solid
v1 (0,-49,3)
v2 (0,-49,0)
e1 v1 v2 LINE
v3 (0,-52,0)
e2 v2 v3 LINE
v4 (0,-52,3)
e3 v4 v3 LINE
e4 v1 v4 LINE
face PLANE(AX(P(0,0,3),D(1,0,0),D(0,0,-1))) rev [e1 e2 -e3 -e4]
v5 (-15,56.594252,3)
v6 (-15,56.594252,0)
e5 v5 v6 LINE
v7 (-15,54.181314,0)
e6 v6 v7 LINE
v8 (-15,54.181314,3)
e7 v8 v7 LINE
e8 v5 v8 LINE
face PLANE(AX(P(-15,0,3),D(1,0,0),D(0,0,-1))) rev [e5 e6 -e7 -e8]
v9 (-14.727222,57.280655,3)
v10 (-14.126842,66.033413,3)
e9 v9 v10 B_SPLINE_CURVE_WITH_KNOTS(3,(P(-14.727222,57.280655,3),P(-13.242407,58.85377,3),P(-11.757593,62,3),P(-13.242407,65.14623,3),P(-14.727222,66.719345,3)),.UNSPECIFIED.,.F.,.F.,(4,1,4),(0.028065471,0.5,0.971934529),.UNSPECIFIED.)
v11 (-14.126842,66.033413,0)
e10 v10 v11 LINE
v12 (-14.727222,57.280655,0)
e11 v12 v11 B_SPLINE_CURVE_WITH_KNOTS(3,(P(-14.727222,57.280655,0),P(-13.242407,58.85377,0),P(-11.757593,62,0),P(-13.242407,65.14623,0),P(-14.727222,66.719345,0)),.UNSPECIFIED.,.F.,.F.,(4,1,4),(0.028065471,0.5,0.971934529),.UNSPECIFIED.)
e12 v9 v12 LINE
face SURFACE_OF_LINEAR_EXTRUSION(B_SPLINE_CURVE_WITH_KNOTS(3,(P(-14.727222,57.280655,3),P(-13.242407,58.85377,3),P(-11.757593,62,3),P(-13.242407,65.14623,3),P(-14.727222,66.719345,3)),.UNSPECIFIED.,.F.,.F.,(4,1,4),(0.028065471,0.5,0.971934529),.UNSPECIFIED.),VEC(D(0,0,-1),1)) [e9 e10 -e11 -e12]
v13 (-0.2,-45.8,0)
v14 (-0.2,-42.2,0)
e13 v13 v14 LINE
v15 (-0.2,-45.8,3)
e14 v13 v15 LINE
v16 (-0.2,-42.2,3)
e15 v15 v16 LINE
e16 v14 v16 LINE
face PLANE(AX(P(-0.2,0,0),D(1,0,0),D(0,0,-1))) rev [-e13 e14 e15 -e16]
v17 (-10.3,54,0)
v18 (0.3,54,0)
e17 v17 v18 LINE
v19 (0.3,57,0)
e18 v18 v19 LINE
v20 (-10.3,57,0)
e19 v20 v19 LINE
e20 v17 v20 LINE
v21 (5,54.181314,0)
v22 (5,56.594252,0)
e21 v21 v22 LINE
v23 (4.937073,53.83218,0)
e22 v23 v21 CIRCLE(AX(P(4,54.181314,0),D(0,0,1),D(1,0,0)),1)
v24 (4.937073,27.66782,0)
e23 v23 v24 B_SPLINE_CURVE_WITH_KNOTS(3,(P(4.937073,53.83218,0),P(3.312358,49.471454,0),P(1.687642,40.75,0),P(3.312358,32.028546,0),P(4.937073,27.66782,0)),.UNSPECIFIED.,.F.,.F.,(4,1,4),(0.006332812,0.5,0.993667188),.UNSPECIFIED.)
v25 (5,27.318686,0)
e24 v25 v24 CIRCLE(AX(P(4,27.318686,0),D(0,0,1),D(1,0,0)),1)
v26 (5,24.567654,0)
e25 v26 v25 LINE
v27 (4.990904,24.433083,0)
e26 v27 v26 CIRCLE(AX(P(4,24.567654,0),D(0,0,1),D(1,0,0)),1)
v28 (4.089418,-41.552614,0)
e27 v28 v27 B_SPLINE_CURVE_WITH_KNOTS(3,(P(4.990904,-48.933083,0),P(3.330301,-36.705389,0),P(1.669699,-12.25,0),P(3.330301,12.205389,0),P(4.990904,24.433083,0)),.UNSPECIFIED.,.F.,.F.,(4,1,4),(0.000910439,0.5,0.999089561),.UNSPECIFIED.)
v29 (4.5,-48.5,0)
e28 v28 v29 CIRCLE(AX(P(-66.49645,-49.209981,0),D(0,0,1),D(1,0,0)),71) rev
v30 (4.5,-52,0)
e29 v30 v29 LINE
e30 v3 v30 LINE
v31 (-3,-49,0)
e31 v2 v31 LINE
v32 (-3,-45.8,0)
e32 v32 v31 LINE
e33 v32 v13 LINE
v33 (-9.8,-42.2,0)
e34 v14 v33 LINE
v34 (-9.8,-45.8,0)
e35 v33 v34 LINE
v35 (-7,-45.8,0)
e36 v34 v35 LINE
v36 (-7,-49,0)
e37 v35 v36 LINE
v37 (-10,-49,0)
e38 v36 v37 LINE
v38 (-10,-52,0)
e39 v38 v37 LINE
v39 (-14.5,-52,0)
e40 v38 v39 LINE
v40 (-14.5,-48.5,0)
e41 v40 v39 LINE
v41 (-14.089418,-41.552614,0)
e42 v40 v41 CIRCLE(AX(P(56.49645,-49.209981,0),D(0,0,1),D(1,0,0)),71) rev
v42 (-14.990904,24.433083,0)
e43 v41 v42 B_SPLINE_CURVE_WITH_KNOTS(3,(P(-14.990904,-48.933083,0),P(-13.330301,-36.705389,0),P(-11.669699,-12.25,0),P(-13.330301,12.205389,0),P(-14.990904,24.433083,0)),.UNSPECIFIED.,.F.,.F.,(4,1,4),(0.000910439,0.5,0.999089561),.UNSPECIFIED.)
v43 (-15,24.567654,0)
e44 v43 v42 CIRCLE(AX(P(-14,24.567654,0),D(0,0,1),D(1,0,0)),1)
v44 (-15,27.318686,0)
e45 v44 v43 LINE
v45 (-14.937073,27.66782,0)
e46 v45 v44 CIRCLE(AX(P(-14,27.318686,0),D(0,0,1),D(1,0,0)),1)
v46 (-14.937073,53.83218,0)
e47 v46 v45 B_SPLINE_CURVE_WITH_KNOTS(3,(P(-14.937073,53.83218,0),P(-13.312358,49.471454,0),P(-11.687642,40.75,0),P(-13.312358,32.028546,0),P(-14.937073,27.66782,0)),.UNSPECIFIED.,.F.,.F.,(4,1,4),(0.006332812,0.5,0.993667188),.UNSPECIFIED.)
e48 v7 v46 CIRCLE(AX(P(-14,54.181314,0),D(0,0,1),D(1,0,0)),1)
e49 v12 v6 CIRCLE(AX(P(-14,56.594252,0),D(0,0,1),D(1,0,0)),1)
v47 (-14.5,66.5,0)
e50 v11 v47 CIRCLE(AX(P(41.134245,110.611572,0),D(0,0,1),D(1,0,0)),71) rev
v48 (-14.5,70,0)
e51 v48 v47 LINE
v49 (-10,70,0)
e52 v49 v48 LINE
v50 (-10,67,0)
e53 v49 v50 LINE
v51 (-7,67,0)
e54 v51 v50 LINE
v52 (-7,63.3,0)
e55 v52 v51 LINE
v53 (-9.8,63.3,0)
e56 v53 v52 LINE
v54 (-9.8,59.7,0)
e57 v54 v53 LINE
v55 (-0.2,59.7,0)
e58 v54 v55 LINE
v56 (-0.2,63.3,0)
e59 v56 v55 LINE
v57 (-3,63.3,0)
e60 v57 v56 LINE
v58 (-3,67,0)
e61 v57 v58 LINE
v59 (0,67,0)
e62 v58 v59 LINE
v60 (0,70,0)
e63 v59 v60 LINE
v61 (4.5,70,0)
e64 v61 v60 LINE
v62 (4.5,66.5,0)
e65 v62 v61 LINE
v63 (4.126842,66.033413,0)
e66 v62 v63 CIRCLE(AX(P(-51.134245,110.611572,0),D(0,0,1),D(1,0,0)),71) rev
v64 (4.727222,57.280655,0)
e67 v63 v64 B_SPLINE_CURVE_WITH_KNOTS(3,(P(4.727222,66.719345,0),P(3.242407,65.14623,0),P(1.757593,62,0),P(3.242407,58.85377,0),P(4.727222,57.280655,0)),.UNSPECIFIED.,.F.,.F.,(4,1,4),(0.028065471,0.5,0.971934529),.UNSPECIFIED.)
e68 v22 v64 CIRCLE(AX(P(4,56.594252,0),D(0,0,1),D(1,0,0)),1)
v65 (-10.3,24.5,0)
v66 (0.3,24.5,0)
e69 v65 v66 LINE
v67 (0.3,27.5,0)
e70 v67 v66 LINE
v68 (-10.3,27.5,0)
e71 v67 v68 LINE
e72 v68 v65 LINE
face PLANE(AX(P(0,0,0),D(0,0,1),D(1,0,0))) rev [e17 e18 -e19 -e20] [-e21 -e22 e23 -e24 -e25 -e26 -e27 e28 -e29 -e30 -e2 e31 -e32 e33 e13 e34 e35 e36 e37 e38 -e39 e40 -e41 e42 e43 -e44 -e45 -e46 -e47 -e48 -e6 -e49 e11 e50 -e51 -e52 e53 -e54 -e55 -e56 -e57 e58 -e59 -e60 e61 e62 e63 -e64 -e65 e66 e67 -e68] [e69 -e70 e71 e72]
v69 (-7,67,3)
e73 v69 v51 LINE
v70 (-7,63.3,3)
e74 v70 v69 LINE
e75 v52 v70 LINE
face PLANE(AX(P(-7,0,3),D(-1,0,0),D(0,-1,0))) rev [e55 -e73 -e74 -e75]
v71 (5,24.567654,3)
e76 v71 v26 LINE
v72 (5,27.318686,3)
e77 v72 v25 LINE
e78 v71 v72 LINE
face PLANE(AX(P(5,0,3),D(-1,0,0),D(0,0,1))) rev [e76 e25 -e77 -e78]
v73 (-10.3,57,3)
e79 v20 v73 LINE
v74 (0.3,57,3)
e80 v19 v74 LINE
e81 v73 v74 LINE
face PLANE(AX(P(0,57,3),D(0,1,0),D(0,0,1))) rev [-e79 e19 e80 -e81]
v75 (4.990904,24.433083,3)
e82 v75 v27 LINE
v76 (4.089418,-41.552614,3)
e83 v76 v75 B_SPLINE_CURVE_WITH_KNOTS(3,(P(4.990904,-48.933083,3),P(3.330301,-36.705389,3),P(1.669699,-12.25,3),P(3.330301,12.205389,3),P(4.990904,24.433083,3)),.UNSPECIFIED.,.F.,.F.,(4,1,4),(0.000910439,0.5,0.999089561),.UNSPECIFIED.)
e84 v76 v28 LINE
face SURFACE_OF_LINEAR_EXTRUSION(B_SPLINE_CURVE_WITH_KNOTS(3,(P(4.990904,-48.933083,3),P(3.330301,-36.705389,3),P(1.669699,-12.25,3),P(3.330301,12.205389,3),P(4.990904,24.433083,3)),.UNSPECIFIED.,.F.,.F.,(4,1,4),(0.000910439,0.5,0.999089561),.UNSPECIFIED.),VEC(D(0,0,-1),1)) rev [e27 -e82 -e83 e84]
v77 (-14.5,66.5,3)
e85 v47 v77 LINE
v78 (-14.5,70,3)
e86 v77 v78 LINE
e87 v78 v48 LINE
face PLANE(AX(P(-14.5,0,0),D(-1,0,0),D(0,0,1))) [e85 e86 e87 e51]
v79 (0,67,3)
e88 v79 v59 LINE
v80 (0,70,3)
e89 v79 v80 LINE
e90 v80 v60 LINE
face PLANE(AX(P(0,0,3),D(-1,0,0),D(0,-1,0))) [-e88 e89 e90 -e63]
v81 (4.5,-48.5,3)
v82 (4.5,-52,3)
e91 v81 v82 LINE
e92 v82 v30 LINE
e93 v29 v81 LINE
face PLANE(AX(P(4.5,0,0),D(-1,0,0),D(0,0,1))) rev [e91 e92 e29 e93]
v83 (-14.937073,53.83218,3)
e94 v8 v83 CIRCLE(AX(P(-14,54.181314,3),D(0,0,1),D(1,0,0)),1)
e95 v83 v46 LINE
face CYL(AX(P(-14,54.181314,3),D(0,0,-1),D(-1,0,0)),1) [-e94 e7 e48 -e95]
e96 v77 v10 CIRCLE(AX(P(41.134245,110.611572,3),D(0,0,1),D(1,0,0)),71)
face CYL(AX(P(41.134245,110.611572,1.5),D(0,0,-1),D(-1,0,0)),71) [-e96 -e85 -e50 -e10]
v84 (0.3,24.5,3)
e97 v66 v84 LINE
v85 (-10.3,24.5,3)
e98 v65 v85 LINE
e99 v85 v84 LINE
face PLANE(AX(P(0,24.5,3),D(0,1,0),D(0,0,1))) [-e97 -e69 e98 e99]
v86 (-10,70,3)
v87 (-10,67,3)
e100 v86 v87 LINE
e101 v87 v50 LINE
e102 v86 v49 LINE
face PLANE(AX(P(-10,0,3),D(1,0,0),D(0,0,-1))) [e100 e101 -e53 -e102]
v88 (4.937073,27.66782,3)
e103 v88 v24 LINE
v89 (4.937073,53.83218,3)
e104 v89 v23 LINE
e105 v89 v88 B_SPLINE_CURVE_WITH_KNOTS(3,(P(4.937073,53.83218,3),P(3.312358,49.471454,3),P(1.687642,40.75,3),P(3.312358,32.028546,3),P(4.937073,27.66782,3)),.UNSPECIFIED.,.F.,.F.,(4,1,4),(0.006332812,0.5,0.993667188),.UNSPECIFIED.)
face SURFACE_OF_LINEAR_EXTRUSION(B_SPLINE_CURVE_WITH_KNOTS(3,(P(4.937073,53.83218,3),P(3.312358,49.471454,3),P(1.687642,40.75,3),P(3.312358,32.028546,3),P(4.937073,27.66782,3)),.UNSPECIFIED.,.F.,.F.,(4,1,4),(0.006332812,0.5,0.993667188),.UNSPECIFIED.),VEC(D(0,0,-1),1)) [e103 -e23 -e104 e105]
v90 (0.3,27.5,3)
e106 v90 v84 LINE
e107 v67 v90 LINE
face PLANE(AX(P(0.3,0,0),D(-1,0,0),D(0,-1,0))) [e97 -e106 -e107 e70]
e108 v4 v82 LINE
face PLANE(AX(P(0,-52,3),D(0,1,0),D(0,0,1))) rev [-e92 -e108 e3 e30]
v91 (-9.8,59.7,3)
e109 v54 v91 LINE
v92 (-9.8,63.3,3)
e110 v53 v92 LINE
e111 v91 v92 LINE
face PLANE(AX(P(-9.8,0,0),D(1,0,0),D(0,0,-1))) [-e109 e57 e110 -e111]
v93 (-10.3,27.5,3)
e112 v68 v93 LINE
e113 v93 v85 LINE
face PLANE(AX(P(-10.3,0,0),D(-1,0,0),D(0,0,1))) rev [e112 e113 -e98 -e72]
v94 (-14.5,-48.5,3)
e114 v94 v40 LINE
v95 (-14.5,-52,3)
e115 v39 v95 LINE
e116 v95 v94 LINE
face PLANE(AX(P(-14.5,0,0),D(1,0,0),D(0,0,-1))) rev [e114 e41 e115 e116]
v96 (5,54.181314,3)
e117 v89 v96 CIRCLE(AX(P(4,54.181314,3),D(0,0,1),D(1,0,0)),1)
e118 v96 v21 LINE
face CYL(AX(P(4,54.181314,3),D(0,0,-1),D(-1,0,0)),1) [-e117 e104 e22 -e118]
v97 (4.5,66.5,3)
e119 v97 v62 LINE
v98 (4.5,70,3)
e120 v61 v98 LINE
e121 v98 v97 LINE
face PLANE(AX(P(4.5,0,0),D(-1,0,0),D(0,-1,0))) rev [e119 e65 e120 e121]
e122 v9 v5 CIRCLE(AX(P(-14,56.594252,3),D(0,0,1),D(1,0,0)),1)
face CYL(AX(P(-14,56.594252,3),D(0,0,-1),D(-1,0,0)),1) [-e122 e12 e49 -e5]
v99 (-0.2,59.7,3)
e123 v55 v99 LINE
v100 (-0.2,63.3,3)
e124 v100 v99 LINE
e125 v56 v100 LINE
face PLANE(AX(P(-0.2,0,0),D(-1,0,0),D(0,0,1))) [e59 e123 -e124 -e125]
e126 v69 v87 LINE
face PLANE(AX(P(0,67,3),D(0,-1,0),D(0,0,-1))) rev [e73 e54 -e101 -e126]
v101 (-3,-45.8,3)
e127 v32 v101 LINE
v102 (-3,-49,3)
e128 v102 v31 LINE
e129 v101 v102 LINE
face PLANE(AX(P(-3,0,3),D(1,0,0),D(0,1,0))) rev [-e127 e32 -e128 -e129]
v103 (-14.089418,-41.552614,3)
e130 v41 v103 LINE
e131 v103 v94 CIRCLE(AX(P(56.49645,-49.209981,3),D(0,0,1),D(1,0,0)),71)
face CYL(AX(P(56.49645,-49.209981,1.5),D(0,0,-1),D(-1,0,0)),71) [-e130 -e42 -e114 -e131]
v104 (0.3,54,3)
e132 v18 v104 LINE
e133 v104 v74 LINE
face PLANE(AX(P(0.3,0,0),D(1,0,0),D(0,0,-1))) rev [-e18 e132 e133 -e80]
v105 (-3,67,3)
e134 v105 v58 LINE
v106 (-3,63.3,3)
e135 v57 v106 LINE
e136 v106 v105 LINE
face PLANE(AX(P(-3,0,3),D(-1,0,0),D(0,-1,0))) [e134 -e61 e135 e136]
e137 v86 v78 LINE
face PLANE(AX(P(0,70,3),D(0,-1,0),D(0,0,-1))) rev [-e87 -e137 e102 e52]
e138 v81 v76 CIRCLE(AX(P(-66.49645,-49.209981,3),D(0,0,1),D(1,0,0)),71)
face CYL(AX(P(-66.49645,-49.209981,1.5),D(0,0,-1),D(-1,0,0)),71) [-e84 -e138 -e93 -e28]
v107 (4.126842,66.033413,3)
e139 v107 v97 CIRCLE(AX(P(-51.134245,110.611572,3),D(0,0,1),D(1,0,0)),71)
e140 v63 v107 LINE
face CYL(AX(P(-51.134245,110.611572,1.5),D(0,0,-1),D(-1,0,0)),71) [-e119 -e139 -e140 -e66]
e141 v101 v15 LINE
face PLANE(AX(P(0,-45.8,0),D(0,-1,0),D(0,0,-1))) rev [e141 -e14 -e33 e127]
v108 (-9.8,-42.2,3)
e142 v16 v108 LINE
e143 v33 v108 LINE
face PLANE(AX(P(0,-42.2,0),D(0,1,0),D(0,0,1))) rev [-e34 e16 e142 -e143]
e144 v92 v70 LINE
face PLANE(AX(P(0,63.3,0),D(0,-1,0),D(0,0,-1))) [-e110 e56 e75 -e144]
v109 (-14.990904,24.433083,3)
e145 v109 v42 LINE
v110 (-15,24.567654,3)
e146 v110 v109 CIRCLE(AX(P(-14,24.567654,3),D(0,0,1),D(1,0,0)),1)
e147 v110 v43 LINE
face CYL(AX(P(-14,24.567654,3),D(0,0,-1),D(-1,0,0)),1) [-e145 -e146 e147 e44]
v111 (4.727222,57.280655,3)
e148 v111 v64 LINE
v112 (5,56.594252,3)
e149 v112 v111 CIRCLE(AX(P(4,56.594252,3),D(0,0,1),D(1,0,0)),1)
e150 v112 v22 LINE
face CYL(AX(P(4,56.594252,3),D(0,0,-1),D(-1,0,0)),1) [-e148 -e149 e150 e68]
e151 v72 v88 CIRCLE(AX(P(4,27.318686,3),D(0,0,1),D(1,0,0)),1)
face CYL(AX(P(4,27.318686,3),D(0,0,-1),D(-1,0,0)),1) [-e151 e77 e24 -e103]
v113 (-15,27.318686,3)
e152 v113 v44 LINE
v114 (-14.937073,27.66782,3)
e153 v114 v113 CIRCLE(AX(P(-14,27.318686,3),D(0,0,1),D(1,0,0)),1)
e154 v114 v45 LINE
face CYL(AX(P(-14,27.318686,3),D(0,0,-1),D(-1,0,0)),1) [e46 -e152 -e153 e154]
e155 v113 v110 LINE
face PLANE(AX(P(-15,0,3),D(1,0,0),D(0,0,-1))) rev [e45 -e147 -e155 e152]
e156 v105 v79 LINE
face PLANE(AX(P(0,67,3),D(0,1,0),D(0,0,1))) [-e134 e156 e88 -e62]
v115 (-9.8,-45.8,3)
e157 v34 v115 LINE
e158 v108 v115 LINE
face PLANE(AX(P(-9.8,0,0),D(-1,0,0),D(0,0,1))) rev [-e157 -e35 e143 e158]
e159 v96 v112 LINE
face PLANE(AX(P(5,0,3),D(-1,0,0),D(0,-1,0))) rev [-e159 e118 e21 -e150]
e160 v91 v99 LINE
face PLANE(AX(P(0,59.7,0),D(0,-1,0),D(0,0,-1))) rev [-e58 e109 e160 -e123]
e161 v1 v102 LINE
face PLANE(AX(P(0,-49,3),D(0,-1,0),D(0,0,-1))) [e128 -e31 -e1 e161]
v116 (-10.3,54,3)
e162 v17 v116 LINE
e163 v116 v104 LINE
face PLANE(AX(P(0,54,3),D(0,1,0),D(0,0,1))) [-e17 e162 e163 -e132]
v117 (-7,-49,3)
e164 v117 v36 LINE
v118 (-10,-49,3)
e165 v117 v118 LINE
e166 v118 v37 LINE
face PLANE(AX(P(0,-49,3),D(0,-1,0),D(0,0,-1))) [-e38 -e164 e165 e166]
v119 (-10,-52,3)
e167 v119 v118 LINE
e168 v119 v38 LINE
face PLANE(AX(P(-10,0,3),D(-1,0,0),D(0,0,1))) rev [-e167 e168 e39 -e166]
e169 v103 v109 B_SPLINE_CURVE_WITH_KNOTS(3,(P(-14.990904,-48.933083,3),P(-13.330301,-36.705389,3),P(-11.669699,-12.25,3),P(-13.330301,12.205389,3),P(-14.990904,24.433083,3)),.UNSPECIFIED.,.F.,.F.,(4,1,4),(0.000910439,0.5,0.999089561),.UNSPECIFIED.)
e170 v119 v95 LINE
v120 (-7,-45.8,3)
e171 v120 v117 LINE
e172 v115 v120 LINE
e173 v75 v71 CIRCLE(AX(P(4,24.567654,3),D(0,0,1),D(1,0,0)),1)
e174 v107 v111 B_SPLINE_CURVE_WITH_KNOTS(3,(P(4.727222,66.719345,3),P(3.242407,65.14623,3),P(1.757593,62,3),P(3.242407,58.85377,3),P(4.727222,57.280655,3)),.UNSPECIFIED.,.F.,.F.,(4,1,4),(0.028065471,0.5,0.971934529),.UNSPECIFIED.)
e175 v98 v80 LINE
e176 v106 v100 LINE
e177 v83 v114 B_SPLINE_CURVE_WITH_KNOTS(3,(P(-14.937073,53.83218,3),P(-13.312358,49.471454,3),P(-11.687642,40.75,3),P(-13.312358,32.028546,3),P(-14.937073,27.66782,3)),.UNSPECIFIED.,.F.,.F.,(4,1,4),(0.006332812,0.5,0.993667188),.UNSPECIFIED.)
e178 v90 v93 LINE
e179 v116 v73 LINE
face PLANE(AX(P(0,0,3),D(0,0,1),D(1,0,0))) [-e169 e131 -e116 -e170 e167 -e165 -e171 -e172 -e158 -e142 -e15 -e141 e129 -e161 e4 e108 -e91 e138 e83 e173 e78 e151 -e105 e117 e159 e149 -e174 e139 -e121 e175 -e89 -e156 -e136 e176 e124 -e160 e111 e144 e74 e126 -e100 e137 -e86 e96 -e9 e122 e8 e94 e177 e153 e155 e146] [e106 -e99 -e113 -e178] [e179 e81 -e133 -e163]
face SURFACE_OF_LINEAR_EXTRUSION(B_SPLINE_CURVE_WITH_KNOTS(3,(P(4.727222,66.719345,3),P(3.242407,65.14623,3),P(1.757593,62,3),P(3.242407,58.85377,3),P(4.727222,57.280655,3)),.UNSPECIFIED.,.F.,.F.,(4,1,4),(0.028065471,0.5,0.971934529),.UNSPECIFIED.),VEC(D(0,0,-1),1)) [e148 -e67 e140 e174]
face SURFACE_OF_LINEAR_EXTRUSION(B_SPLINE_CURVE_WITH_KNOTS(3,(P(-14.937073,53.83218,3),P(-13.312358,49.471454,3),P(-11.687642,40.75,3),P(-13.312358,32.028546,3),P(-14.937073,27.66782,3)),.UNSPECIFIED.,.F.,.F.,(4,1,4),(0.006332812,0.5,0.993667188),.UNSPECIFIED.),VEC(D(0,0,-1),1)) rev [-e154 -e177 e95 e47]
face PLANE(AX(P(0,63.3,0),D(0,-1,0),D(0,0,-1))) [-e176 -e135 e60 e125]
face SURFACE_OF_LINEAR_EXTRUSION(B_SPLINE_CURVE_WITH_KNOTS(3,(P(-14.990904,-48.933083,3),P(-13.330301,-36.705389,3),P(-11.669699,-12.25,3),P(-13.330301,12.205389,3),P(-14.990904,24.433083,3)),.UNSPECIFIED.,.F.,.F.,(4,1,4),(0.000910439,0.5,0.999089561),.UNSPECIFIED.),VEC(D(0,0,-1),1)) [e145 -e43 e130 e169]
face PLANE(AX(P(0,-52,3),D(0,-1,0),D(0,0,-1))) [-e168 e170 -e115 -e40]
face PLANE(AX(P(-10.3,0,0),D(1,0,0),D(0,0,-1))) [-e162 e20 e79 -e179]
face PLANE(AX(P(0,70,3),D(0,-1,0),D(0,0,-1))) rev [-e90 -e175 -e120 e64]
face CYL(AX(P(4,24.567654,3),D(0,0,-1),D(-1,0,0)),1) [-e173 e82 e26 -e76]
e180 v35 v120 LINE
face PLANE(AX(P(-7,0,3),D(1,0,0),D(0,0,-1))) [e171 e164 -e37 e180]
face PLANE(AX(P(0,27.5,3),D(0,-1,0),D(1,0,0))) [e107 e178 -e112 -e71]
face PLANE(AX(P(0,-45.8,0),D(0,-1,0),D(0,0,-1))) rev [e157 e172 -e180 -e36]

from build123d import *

# Parameters (mm, degrees)
CROQUIS1_W              = 10
CROQUIS1_H              = 3
SALIENTE_EXTRUIR1_DEPTH = 3
CROQUIS2_W              = 0.3
CROQUIS2_H              = 0.3
CROQUIS2_H_2            = 3
CORTAR_EXTRUIR2_DEPTH   = 3
CROQUIS3_W              = 3
CROQUIS3_H              = 3.5
CORTAR_EXTRUIR3_DEPTH   = 0.5
CROQUIS4_W              = 3
CROQUIS4_H              = 3.5
CORTAR_EXTRUIR4_DEPTH   = 0.5
CROQUIS5_W              = 3
CROQUIS5_H              = 3.5
CORTAR_EXTRUIR5_DEPTH   = 0.5
CROQUIS6_W              = 3
CROQUIS6_H              = 3.5
CORTAR_EXTRUIR6_DEPTH   = 0.5
REDONDEO1_START         = -1
REDONDEO1_DEPTH         = 5


with BuildPart() as part:
    # Croquis1 → Saliente-Extruir1 (new body)
    with BuildSketch(Plane.XY):
        with BuildLine():
            Line((-10, 70), (-10, 67))
            Line((-10, 67), (-7, 67))
            Line((-7, 67), (-7, 63))
            Line((-7, 63), (-9.5, 63))
            Line((-9.5, 63), (-9.5, 60))
            Line((-9.5, 60), (-0.5, 60))
            Line((-0.5, 60), (-0.5, 63))
            Line((-0.5, 63), (-3, 63))
            Line((-3, 63), (-3, 67))
            Line((-3, 67), (0, 67))
            Line((0, 67), (0, 70))
            Line((0, 70), (5, 70))
            Line((5, 70), (5, 67.405747627))
            ThreePointArc((5, 67.405747627), (4.929306729, 67.036438809), (4.727221995, 66.719345288))
            add(Edge.make_bspline(
                [(4.727221995, 66.719345288), (3.242407332, 65.146230192), (1.757592668, 62), (3.242407332, 58.853769808), (4.727221995, 57.280654712)],
                knots=[0.028065471, 0.028065471, 0.028065471, 0.028065471, 0.5, 0.971934529, 0.971934529, 0.971934529, 0.971934529], degree=3))
            ThreePointArc((4.727221995, 57.280654712), (4.929306729, 56.963561191), (5, 56.594252373))
            Line((5, 56.594252373), (5, 54.181314171))
            ThreePointArc((5, 54.181314171), (4.9841425, 54.003934523), (4.937072921, 53.832180471))
            add(Edge.make_bspline(
                [(4.937072921, 53.832180471), (3.31235764, 49.471453647), (1.68764236, 40.75), (3.31235764, 32.028546353), (4.937072921, 27.667819529)],
                knots=[0.006332812, 0.006332812, 0.006332812, 0.006332812, 0.5, 0.993667188, 0.993667188, 0.993667188, 0.993667188], degree=3))
            ThreePointArc((4.937072921, 27.667819529), (4.9841425, 27.496065477), (5, 27.318685829))
            Line((5, 27.318685829), (5, 24.567654138))
            ThreePointArc((5, 24.567654138), (4.997723384, 24.500214919), (4.990903903, 24.433082766))
            add(Edge.make_bspline(
                [(4.990903903, -48.933082766), (3.330301301, -36.70538851), (1.669698699, -12.25), (3.330301301, 12.20538851), (4.990903903, 24.433082766)],
                knots=[0.000910439, 0.000910439, 0.000910439, 0.000910439, 0.5, 0.999089561, 0.999089561, 0.999089561, 0.999089561], degree=3))
            ThreePointArc((4.990903903, -48.933082766), (4.997723384, -49.000214919), (5, -49.067654138))
            Line((5, -49.067654138), (5, -51.701381229))
            Line((5, -51.701381229), (5, -52))
            Line((5, -52), (0, -52))
            Line((0, -52), (0, -49))
            Line((0, -49), (-3, -49))
            Line((-3, -49), (-3, -45.5))
            Line((-3, -45.5), (-0.5, -45.5))
            Line((-0.5, -45.5), (-0.5, -42.5))
            Line((-0.5, -42.5), (-9.5, -42.5))
            Line((-9.5, -42.5), (-9.5, -45.5))
            Line((-9.5, -45.5), (-7, -45.5))
            Line((-7, -45.5), (-7, -49))
            Line((-7, -49), (-10, -49))
            Line((-10, -49), (-10, -52))
            Line((-10, -52), (-15, -52))
            Line((-15, -52), (-15, -51.701381229))
            Line((-15, -51.701381229), (-15, -49.067654138))
            ThreePointArc((-15, -49.067654138), (-14.997723384, -49.000214919), (-14.990903903, -48.933082766))
            add(Edge.make_bspline(
                [(-14.990903903, -48.933082766), (-13.330301301, -36.70538851), (-11.669698699, -12.25), (-13.330301301, 12.20538851), (-14.990903903, 24.433082766)],
                knots=[0.000910439, 0.000910439, 0.000910439, 0.000910439, 0.5, 0.999089561, 0.999089561, 0.999089561, 0.999089561], degree=3))
            ThreePointArc((-14.990903903, 24.433082766), (-14.997723384, 24.500214919), (-15, 24.567654138))
            Line((-15, 24.567654138), (-15, 27.318685829))
            ThreePointArc((-15, 27.318685829), (-14.9841425, 27.496065477), (-14.937072921, 27.667819529))
            add(Edge.make_bspline(
                [(-14.937072921, 53.832180471), (-13.31235764, 49.471453647), (-11.68764236, 40.75), (-13.31235764, 32.028546353), (-14.937072921, 27.667819529)],
                knots=[0.006332812, 0.006332812, 0.006332812, 0.006332812, 0.5, 0.993667188, 0.993667188, 0.993667188, 0.993667188], degree=3))
            ThreePointArc((-14.937072921, 53.832180471), (-14.9841425, 54.003934523), (-15, 54.181314171))
            Line((-15, 54.181314171), (-15, 56.594252373))
            ThreePointArc((-15, 56.594252373), (-14.929306729, 56.963561191), (-14.727221995, 57.280654712))
            add(Edge.make_bspline(
                [(-14.727221995, 57.280654712), (-13.242407332, 58.853769808), (-11.757592668, 62), (-13.242407332, 65.146230192), (-14.727221995, 66.719345288)],
                knots=[0.028065471, 0.028065471, 0.028065471, 0.028065471, 0.5, 0.971934529, 0.971934529, 0.971934529, 0.971934529], degree=3))
            ThreePointArc((-14.727221995, 66.719345288), (-14.929306729, 67.036438809), (-15, 67.405747627))
            Line((-15, 67.405747627), (-15, 70))
            Line((-15, 70), (-10, 70))
        make_face()
        with Locations((-5, 26)):
            Rectangle(CROQUIS1_W, CROQUIS1_H, mode=Mode.SUBTRACT)
        with Locations((-5, 55.5)):
            Rectangle(CROQUIS1_W, CROQUIS1_H, mode=Mode.SUBTRACT)
    extrude(amount=SALIENTE_EXTRUIR1_DEPTH)

    # Croquis2 → Cortar-Extruir2 (cut)
    with BuildSketch(Plane.XY.offset(3)):
        Polygon((-9.8, -45.5), (-9.8, -45.8), (-9.5, -45.8), (-7, -45.8), (-7, -45.5), (-9.5, -45.5), (-9.5, -42.5), (-0.5, -42.5), (-0.5, -42.2), (-9.5, -42.2), (-9.8, -42.2), (-9.8, -42.5), align=None)
        Polygon((-0.5, -45.8), (-0.2, -45.8), (-0.2, -45.5), (-0.2, -42.5), (-0.5, -42.5), (-0.5, -45.5), (-3, -45.5), (-3, -45.8), align=None)
        with Locations((-0.35, -42.35)):
            Rectangle(CROQUIS2_W, CROQUIS2_H)
        with Locations((-10.15, 26)):
            Rectangle(CROQUIS2_W, CROQUIS2_H_2)
        with Locations((0.15, 26)):
            Rectangle(CROQUIS2_W, CROQUIS2_H_2)
        with Locations((0.15, 55.5)):
            Rectangle(CROQUIS2_W, CROQUIS2_H_2)
        with Locations((-10.15, 55.5)):
            Rectangle(CROQUIS2_W, CROQUIS2_H_2)
        Polygon((-9.8, 63.3), (-9.5, 63.3), (-7, 63.3), (-7, 63), (-9.5, 63), (-9.5, 60), (-0.5, 60), (-0.5, 63), (-3, 63), (-3, 63.3), (-0.5, 63.3), (-0.2, 63.3), (-0.2, 63), (-0.2, 60), (-0.2, 59.7), (-0.5, 59.7), (-9.5, 59.7), (-9.8, 59.7), (-9.8, 60), (-9.8, 63), align=None)
    extrude(amount=-CORTAR_EXTRUIR2_DEPTH, mode=Mode.SUBTRACT)

    # Croquis3 → Cortar-Extruir3 (cut)
    with BuildSketch(Plane.ZY.offset(15)):
        with Locations((1.5, -50.25)):
            Rectangle(CROQUIS3_W, CROQUIS3_H)
    extrude(amount=-CORTAR_EXTRUIR3_DEPTH, mode=Mode.SUBTRACT)

    # Croquis4 → Cortar-Extruir4 (cut)
    with BuildSketch(Plane(origin=(5, 0, 0), x_dir=(0, 0, -1), z_dir=(1, 0, 0))):
        with Locations((-1.5, -50.25)):
            Rectangle(CROQUIS4_W, CROQUIS4_H)
    extrude(amount=-CORTAR_EXTRUIR4_DEPTH, mode=Mode.SUBTRACT)

    # Croquis5 → Cortar-Extruir5 (cut)
    with BuildSketch(Plane.ZY.offset(15)):
        with Locations((1.5, 68.25)):
            Rectangle(CROQUIS5_W, CROQUIS5_H)
    extrude(amount=-CORTAR_EXTRUIR5_DEPTH, mode=Mode.SUBTRACT)

    # Croquis6 → Cortar-Extruir6 (cut)
    with BuildSketch(Plane(origin=(5, 0, 0), x_dir=(0, 0, -1), z_dir=(1, 0, 0))):
        with Locations((-1.5, 68.25)):
            Rectangle(CROQUIS6_W, CROQUIS6_H)
    extrude(amount=-CORTAR_EXTRUIR6_DEPTH, mode=Mode.SUBTRACT)

    # Redondeo1: read off the stored shape, not the designer's step
    # Redondeo1 outline → Redondeo1 (cut)
    with BuildSketch(Plane.XY.offset(REDONDEO1_START)):
        with BuildLine():
            Line((-14.932435559, -48.5), (-14.5, -48.5))
            ThreePointArc((-14.5, -48.5), (-14.379883961, -45.021273255), (-14.08941772, -41.552614006))
            add(Edge.make_bspline(
                [(-14.932435559, -48.5), (-14.621648088, -46.184204669), (-14.340642142, -43.868409337), (-14.08941772, -41.552614006)],
                knots=[0.006802721, 0.006802721, 0.006802721, 0.006802721, 0.10132498, 0.10132498, 0.10132498, 0.10132498], degree=3))
        make_face()
        with BuildLine():
            add(Edge.make_bspline(
                [(4.932435559, -48.5), (4.621648088, -46.184204669), (4.340642142, -43.868409337), (4.08941772, -41.552614006)],
                knots=[0.006802721, 0.006802721, 0.006802721, 0.006802721, 0.10132498, 0.10132498, 0.10132498, 0.10132498], degree=3))
            ThreePointArc((4.08941772, -41.552614006), (4.379883961, -45.021273255), (4.5, -48.5))
            Line((4.5, -48.5), (4.932435559, -48.5))
        make_face()
        with BuildLine():
            Line((4.525, 66.5), (4.5, 66.5))
            ThreePointArc((4.5, 66.5), (4.313911858, 66.266314057), (4.126842149, 66.033413132))
            add(Edge.make_bspline(
                [(4.525, 66.5), (4.38502394, 66.344471044), (4.252304656, 66.188942088), (4.126842149, 66.033413132)],
                knots=[0.05, 0.05, 0.05, 0.05, 0.096658687, 0.096658687, 0.096658687, 0.096658687], degree=3))
        make_face()
        with BuildLine():
            add(Edge.make_bspline(
                [(-14.126842149, 66.033413132), (-14.252304656, 66.188942088), (-14.38502394, 66.344471044), (-14.525, 66.5)],
                knots=[0.903341313, 0.903341313, 0.903341313, 0.903341313, 0.95, 0.95, 0.95, 0.95], degree=3))
            ThreePointArc((-14.126842149, 66.033413132), (-14.313911858, 66.266314057), (-14.5, 66.5))
            Line((-14.5, 66.5), (-14.525, 66.5))
        make_face()
    extrude(amount=REDONDEO1_DEPTH, mode=Mode.SUBTRACT)


solid = part.part
